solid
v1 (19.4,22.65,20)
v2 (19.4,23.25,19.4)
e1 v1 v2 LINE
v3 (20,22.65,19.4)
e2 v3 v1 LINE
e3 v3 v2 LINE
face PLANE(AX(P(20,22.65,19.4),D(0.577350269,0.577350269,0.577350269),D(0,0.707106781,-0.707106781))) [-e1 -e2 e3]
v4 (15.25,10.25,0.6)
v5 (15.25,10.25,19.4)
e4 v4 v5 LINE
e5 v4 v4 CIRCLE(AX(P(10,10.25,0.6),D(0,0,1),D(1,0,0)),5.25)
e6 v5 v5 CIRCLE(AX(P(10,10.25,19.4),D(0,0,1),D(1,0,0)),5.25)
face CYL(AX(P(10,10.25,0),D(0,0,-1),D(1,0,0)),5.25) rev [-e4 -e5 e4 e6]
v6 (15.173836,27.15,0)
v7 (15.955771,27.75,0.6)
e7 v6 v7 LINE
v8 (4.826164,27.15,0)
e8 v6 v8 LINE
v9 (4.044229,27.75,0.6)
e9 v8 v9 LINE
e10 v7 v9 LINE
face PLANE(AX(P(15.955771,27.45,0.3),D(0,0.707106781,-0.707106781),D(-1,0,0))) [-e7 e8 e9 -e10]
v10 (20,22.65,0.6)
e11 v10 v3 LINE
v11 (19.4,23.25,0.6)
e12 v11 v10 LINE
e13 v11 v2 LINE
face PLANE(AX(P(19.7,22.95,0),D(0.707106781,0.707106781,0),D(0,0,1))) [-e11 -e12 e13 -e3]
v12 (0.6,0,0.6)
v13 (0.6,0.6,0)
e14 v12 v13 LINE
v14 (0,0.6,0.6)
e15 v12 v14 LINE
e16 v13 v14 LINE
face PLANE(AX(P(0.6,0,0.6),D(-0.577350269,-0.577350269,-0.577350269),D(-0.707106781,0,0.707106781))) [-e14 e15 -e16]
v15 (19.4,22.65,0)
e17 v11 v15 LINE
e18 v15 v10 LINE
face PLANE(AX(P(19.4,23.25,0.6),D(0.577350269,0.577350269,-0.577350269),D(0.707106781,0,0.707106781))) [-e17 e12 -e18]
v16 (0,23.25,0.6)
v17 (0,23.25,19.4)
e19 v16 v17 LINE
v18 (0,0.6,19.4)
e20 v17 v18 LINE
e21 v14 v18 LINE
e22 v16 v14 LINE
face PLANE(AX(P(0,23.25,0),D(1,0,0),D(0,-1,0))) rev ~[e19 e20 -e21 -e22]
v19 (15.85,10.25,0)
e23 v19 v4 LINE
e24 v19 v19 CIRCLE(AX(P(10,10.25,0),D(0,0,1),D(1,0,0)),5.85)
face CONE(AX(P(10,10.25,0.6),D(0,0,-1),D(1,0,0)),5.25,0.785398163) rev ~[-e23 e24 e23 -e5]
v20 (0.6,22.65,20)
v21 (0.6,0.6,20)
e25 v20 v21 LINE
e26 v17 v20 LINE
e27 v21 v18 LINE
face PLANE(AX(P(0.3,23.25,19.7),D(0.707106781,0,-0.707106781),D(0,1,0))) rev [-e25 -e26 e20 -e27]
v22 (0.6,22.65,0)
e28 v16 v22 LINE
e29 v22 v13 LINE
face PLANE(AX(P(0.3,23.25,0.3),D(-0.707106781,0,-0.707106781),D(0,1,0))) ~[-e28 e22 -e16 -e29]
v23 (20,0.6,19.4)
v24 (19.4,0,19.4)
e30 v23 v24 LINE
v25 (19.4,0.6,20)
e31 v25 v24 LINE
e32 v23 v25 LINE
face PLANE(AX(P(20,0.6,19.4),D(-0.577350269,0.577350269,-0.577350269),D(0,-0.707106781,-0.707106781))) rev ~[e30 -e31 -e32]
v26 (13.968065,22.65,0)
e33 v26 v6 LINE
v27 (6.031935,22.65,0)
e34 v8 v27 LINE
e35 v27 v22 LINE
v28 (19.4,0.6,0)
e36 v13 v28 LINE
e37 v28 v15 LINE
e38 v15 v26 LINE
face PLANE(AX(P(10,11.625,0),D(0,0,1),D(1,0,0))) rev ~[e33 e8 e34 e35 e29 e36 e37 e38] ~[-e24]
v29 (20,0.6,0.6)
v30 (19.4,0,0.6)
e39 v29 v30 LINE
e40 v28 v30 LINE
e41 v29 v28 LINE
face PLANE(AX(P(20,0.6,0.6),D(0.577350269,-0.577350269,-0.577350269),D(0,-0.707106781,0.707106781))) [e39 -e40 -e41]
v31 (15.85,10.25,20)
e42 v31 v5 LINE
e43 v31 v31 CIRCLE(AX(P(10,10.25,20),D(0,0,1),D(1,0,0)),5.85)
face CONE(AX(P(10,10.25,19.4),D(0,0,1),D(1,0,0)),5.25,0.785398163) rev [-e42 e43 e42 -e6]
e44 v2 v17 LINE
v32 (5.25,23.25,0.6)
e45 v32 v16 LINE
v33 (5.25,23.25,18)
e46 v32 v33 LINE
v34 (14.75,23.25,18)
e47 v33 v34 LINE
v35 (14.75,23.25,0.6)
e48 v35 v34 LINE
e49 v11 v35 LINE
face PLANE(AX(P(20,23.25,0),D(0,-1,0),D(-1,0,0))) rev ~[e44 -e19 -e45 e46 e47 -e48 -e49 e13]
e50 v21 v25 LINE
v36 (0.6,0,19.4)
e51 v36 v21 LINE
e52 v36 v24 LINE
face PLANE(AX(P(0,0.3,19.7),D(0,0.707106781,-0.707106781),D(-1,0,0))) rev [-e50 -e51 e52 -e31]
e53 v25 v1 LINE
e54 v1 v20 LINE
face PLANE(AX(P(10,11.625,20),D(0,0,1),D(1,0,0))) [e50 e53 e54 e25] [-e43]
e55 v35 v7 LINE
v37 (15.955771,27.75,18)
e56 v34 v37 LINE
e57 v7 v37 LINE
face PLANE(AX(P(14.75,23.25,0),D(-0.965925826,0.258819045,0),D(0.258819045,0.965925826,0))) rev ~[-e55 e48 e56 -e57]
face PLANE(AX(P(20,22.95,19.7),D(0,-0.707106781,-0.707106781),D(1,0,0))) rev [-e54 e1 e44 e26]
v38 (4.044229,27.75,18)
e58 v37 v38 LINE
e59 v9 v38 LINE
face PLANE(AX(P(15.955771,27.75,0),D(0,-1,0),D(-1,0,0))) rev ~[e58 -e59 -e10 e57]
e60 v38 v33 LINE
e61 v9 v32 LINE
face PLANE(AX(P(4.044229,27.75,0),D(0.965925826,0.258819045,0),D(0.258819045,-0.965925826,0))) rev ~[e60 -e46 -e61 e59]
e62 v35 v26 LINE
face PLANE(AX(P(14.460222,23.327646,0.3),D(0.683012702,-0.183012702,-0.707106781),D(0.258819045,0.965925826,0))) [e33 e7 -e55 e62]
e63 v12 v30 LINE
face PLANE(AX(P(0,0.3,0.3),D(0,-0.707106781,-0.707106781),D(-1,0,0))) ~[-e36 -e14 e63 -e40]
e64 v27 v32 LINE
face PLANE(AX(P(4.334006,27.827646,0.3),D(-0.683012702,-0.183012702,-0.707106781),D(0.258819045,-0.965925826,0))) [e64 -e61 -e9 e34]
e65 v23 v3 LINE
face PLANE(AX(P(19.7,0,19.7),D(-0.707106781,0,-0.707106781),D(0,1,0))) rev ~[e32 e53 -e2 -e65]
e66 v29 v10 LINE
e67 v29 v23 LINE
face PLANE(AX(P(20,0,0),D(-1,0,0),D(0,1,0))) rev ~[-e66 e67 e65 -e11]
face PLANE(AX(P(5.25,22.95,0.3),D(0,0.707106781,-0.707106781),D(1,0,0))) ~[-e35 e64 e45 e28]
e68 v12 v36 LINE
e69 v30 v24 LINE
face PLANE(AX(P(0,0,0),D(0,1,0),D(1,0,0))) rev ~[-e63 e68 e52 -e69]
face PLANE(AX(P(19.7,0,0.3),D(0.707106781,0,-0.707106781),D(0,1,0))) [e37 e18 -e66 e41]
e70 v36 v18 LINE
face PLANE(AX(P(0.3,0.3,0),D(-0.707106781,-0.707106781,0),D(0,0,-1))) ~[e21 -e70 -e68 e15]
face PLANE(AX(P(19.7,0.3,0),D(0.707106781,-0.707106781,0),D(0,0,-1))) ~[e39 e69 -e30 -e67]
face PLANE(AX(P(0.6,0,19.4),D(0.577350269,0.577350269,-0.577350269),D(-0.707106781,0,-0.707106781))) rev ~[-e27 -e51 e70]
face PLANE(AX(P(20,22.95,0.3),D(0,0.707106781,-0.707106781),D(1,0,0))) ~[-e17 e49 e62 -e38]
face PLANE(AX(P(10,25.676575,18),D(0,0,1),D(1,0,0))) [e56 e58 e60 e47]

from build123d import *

# Parameters (mm, degrees)
F2_R     = 5.25
F3_DEPTH = 20
F4_DEPTH = 18
F5_SIZE  = 0.6


# Not quite as in the source:
# - a feature names something its author has since deleted; it is built from what else it names


with BuildPart() as f3:
    # F2 (on Top) → F3 (new body)
    with BuildSketch(Plane.XY):
        Polygon((5.25, 23.25), (0, 23.25), (0, 0), (20, 0), (20, 23.25), (14.75, 23.25), align=None)
        with Locations((10, 10.25)):
            Circle(F2_R, mode=Mode.SUBTRACT)
    extrude(amount=F3_DEPTH)

    # F2 (on Top) → F4 (join)
    with BuildSketch(Plane.XY):
        Polygon((4.0442286341, 27.75), (5.25, 23.25), (14.75, 23.25), (15.9557713659, 27.75), align=None)
    extrude(amount=F4_DEPTH)

    # F5
    f5_edges = [f3.edges().sort_by_distance(p)[0] for p in [
        (0, 11.625, 0),
        (10, 0, 0),
        (20, 11.625, 0),
        (17.375, 23.25, 0),
        (15.352886, 25.5, 0),
        (10, 27.75, 0),
        (4.647114, 25.5, 0),
        (2.625, 23.25, 0),
        (4.75, 10.25, 0),
        (10, 23.25, 20),
        (0, 11.625, 20),
        (10, 0, 20),
        (20, 11.625, 20),
        (4.75, 10.25, 20),
        (0, 0, 10),
        (20, 0, 10),
        (20, 23.25, 10),
    ]]
    chamfer(f5_edges, length=F5_SIZE)


solid = f3.part
